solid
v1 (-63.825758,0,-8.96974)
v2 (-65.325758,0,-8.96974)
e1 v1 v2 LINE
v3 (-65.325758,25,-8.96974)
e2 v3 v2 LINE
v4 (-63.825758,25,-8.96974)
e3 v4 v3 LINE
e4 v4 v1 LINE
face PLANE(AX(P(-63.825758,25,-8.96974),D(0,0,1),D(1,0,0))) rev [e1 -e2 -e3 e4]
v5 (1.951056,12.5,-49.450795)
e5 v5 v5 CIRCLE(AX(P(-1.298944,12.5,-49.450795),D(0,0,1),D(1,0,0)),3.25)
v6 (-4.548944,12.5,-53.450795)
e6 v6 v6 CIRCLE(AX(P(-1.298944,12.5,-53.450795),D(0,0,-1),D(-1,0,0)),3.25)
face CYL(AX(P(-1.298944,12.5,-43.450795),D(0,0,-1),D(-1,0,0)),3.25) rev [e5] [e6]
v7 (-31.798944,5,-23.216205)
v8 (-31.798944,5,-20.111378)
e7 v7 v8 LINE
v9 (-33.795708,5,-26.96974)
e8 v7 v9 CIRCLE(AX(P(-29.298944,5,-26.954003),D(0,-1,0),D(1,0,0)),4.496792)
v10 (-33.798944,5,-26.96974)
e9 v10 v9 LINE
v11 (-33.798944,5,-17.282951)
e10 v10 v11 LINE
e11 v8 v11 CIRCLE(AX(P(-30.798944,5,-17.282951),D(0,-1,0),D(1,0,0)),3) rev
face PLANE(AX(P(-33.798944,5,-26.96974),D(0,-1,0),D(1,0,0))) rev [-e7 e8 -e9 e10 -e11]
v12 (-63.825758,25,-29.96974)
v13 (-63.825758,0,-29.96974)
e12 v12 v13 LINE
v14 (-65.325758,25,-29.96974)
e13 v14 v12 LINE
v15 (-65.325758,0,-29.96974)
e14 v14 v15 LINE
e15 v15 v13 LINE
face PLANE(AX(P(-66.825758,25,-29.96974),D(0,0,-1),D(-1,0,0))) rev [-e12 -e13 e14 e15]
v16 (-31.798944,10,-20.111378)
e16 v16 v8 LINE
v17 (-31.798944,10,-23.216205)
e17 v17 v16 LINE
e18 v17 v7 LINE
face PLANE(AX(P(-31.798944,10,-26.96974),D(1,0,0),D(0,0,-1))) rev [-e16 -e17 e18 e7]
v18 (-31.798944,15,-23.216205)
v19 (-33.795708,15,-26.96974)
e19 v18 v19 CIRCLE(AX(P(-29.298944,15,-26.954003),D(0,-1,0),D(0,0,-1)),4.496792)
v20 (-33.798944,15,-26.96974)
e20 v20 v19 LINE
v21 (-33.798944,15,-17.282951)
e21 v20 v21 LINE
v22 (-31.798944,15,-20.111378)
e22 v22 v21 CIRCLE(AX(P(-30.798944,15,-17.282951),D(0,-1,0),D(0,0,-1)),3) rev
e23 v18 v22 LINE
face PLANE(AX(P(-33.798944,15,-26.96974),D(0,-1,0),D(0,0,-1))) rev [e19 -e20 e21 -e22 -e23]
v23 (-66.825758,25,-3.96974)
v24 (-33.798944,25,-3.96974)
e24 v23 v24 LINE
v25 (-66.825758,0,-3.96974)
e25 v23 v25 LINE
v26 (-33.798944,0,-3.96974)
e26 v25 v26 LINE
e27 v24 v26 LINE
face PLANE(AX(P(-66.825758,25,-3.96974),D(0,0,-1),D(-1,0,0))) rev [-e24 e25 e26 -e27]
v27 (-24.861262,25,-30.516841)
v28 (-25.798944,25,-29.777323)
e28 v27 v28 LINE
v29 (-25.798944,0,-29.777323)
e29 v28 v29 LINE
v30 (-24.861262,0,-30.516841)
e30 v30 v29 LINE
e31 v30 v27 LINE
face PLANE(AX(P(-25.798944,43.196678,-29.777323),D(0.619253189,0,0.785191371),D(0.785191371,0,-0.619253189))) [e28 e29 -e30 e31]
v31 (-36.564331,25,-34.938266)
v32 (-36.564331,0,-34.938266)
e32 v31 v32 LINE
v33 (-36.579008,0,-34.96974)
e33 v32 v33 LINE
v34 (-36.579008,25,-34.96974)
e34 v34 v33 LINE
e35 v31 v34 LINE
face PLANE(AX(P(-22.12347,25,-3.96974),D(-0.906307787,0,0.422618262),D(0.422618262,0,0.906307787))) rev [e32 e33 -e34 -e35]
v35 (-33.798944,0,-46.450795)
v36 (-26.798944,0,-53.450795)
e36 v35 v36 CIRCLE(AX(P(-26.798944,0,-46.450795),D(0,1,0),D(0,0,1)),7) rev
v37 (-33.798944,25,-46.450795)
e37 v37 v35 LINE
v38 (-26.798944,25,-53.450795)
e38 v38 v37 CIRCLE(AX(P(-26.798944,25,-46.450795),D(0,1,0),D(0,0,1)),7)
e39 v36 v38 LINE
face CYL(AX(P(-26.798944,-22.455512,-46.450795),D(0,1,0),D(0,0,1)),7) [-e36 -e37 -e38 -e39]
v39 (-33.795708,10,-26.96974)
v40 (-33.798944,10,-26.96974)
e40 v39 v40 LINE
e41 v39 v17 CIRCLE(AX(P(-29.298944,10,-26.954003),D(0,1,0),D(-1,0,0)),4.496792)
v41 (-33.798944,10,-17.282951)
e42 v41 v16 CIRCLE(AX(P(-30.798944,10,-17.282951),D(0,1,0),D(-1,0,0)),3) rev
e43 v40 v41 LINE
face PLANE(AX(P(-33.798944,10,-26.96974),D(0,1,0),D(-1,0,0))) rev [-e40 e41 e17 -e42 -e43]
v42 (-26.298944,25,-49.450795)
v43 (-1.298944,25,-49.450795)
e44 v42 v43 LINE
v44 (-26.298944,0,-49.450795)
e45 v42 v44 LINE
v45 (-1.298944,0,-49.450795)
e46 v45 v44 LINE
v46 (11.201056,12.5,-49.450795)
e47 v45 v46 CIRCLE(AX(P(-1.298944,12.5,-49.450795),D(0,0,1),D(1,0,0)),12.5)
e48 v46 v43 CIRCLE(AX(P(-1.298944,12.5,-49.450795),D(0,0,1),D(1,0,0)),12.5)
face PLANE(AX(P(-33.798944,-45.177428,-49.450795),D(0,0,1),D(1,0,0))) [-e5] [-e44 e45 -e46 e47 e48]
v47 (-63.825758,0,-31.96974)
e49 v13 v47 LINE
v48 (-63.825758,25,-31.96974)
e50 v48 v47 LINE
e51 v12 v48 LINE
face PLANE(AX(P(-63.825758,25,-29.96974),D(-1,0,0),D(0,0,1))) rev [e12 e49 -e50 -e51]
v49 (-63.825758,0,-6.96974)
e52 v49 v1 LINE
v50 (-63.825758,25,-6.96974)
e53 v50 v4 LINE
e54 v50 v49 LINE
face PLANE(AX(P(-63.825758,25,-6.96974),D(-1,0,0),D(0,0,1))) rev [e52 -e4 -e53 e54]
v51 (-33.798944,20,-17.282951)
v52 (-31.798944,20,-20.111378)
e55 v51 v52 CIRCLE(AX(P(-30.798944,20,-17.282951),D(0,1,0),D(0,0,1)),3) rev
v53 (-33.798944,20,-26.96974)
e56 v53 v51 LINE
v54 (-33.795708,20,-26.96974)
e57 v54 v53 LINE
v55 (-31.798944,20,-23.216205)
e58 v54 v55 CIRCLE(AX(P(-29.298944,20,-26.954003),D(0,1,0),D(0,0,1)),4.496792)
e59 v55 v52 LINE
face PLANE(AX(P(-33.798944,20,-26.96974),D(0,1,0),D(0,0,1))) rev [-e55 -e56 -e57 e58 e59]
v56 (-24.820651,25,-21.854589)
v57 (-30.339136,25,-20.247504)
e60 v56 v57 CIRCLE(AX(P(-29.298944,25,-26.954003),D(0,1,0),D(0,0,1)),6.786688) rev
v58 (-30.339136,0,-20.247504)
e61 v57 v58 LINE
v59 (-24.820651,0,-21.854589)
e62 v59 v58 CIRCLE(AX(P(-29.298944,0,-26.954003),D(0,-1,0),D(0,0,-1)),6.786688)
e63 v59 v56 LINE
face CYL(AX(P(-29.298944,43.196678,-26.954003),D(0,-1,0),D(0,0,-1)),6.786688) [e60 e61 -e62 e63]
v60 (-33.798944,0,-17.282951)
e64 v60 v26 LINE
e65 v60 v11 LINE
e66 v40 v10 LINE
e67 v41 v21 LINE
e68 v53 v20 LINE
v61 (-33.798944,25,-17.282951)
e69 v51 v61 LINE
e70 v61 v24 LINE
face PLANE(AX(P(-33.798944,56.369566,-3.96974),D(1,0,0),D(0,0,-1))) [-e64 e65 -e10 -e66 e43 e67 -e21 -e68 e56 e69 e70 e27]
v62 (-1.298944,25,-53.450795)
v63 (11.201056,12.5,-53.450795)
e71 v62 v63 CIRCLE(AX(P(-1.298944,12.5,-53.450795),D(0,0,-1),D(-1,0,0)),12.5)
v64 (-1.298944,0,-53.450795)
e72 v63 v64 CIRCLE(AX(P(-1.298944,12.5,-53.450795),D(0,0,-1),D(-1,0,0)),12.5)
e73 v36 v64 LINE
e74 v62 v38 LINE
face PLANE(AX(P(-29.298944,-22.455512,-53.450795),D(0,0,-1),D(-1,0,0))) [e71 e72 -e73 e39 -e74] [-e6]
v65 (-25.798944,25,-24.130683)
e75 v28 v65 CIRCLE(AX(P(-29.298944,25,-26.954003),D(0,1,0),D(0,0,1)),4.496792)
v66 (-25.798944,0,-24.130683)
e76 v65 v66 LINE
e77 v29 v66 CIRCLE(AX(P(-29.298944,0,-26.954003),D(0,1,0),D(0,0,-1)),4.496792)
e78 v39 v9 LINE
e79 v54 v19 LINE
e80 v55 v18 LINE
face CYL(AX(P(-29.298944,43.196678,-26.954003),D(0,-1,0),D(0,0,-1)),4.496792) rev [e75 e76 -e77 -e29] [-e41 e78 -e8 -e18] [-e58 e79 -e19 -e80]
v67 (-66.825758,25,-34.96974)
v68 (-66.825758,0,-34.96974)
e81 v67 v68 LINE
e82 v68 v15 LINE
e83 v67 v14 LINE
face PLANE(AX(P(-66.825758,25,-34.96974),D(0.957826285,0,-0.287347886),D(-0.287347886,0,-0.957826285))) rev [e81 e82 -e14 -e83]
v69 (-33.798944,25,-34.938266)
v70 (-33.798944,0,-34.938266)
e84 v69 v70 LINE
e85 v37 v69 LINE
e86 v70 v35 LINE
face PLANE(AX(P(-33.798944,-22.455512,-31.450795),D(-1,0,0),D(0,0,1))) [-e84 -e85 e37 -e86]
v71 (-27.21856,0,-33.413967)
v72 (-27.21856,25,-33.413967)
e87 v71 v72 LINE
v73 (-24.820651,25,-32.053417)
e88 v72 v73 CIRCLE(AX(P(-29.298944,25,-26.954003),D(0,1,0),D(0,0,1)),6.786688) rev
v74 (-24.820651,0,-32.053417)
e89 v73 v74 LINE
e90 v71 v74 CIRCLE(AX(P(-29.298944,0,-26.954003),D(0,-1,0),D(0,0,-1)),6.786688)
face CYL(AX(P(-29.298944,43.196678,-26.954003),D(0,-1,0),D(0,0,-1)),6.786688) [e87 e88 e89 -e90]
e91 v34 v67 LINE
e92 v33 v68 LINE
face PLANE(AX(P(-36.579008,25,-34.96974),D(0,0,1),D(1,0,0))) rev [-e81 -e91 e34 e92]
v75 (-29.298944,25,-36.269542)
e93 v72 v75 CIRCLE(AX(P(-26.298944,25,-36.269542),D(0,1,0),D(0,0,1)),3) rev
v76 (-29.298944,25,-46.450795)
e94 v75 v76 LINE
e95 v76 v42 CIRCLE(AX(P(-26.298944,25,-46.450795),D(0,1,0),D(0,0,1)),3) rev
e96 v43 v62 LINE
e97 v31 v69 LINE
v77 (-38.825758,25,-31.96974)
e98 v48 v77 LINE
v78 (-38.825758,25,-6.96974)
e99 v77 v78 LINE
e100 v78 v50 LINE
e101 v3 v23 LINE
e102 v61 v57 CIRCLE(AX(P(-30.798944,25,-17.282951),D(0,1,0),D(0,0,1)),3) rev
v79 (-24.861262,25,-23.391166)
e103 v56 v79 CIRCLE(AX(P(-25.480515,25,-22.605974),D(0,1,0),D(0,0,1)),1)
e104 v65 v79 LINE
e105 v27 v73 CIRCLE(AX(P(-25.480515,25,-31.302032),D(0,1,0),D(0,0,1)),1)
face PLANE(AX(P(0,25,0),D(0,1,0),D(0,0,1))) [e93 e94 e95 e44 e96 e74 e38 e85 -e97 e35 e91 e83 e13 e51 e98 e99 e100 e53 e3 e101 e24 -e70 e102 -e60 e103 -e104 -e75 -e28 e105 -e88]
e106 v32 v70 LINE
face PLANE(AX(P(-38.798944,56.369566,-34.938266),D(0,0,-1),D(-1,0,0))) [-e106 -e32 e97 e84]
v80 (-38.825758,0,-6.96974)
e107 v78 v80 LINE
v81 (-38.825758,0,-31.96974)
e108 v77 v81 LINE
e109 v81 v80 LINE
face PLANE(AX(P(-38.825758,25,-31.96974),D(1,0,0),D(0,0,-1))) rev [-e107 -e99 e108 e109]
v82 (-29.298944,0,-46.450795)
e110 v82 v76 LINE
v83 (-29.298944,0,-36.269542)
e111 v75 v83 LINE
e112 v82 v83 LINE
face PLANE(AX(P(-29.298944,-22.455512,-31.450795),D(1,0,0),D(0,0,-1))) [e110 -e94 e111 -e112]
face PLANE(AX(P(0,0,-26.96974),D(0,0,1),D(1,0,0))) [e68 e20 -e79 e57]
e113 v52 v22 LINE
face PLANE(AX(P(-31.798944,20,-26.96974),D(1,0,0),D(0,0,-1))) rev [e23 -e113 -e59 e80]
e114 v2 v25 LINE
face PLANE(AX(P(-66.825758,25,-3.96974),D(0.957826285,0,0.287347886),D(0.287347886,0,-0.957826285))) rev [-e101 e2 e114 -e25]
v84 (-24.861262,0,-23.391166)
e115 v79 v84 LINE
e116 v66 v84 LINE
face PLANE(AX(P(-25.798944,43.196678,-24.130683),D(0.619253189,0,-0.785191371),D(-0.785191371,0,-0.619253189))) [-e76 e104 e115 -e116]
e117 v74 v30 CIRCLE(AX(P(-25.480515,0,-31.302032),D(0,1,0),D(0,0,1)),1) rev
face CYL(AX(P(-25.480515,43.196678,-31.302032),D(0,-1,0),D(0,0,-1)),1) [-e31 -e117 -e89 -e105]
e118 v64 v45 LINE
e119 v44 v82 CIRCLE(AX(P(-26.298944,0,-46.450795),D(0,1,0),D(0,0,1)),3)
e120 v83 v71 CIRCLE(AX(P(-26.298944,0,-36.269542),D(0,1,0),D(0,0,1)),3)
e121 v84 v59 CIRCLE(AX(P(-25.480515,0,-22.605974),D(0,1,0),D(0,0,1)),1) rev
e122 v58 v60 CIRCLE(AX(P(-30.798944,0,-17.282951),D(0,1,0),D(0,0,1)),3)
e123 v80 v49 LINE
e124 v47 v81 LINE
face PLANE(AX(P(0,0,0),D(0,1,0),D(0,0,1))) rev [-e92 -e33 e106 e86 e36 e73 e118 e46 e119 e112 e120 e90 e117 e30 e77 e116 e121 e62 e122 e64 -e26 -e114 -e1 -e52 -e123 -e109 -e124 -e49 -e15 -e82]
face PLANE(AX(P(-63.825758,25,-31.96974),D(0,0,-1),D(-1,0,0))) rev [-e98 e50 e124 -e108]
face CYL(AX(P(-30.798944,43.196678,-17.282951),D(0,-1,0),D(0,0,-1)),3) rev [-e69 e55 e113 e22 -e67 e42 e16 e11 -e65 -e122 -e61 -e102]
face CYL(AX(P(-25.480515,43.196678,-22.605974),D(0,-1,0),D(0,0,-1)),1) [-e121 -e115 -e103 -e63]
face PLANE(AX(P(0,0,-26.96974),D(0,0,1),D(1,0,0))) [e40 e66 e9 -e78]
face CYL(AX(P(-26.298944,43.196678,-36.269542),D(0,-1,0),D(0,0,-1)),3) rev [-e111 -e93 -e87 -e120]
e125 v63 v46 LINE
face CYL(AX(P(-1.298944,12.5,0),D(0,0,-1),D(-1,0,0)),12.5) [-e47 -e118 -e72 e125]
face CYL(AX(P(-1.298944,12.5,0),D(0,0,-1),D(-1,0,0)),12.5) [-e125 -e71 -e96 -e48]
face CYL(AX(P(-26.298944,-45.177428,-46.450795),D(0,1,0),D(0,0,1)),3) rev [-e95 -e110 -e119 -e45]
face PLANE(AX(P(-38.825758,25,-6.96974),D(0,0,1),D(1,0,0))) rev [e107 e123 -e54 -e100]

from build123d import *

# Parameters (mm, degrees)
EXTRUDE_1_DEPTH      = 25
CUT_EXTRUDE_4_DEPTH  = 80.457942189
SKETCH_7_W           = 16.60831278
SKETCH_7_H           = 38.473598513
CUT_EXTRUDE_14_DEPTH = 80.457942189
SKETCH_8_W           = 5
SKETCH_8_H           = 30.968526609
EXTRUDE_2_DEPTH      = 25
EXTRUDE_3_DEPTH      = 25
FILLET_4_R           = 1
SKETCH_10_W          = 10.885979968
SKETCH_10_H          = 16.094938527
CUT_EXTRUDE_15_DEPTH = 80.457942189
SKETCH_11_W          = 4.5
SKETCH_11_H          = 22
EXTRUDE_5_DEPTH      = 25
SKETCH_14_W          = 45
SKETCH_14_H          = 4
EXTRUDE_6_DEPTH      = 25
SKETCH_15_R          = 3.25
CUT_EXTRUDE_19_DEPTH = 10
FILLET_5_R           = 12.5
FILLET_6_R           = 3
FILLET_7_R           = 7
FILLET_8_R           = 3
SKETCH_17_W          = 2
SKETCH_17_H          = 5
CUT_EXTRUDE_21_DEPTH = 23


with BuildPart() as part:
    # Эскиз1 → Бобышка-Вытянуть1 (new body)
    with BuildSketch(Plane(origin=(0, 0, 0), x_dir=(1, 0, 0), z_dir=(0, 1, 0))):
        Polygon((-66.825757576, 34.969739794), (-66.825757576, 29.969739794), (-63.825757576, 29.969739794), (-63.825757576, 31.969739794), (-38.825757576, 31.969739794), (-38.825757576, 6.969739794), (-63.825757576, 6.969739794), (-63.825757576, 8.969739794), (-66.825757576, 8.969739794), (-66.825757576, 3.969739794), (-22.123470102, 3.969739794), (-36.579007505, 34.969739794), align=None)
    extrude(amount=EXTRUDE_1_DEPTH)

    # Эскиз3 → Вырез-Вытянуть4 (cut, through all)
    with BuildSketch(Plane.XZ):
        Polygon((-66.825757576, -3.969739794), (-65.325757576, -8.969739794), (-66.825757576, -8.969739794), align=None)
        Polygon((-66.825757576, -29.969739794), (-66.825757576, -34.969739794), (-65.325757576, -29.969739794), align=None)
    extrude(amount=-CUT_EXTRUDE_4_DEPTH, mode=Mode.SUBTRACT)

    # Эскиз7 → Вырез-Вытянуть14 (cut, through all)
    with BuildSketch(Plane(origin=(0, 0, 0), x_dir=(-1, 0, 0), z_dir=(0, -1, 0))):
        with Locations((27.703474463, 20.539743139)):
            Rectangle(SKETCH_7_W, SKETCH_7_H)
    extrude(amount=-CUT_EXTRUDE_14_DEPTH, mode=Mode.SUBTRACT)

    # Эскиз8 → Бобышка-Вытянуть2 (add)
    with BuildSketch(Plane(origin=(0, 0, 0), x_dir=(-1, 0, 0), z_dir=(0, -1, 0))):
        with Locations((36.298943925, 19.454003098)):
            Rectangle(SKETCH_8_W, SKETCH_8_H)
    extrude(amount=-EXTRUDE_2_DEPTH)

    # Эскиз9 → Бобышка-Вытянуть3 (add)
    with BuildSketch(Plane.XZ):
        with BuildLine():
            Line((-25.798943925, -9.121669553), (-24.000865345, -7.695483003))
            ThreePointArc((-24.000865345, -7.695483003), (-36.096342696, -11.954003099), (-24.000865345, -16.212523195))
            Line((-24.000865345, -16.212523195), (-25.798943925, -14.786336644))
            ThreePointArc((-25.798943925, -14.786336644), (-33.80140029, -11.954003099), (-25.798943925, -9.121669553))
        make_face()
        with BuildLine():
            Line((-25.798943925, -24.130682885), (-24.000865345, -22.7126007))
            ThreePointArc((-24.000865345, -22.7126007), (-36.0856317, -26.954003099), (-24.000865345, -31.195405497))
            Line((-24.000865345, -31.195405497), (-25.798943925, -29.777323313))
            ThreePointArc((-25.798943925, -29.777323313), (-33.795735785, -26.954003099), (-25.798943925, -24.130682885))
        make_face()
    extrude(amount=-EXTRUDE_3_DEPTH)

    # Скругление4
    fillet_4_edges = [part.edges().sort_by_distance(p)[0] for p in [
        (-24.000865345, 12.5, -7.695483003),
        (-24.000865345, 12.5, -16.212523195),
        (-24.000865345, 12.5, -22.7126007),
        (-24.000865345, 12.5, -31.195405497),
    ]]
    fillet(fillet_4_edges, radius=FILLET_4_R)

    # Эскиз10 → Вырез-Вытянуть15 (cut, through all)
    with BuildSketch(Plane(origin=(0, 25, 0), x_dir=(1, 0, 0), z_dir=(0, 1, 0))):
        with Locations((-28.355953941, 12.017209058)):
            Rectangle(SKETCH_10_W, SKETCH_10_H)
    extrude(amount=-CUT_EXTRUDE_15_DEPTH, mode=Mode.SUBTRACT)

    # Эскиз11 → Бобышка-Вытянуть5 (add)
    with BuildSketch(Plane(origin=(0, 25, 0), x_dir=(1, 0, 0), z_dir=(0, 1, 0))):
        with Locations((-31.548943925, 42.450794958)):
            Rectangle(SKETCH_11_W, SKETCH_11_H)
    extrude(amount=-EXTRUDE_5_DEPTH)

    # Эскиз14 → Бобышка-Вытянуть6 (add)
    with BuildSketch(Plane(origin=(0, 25, 0), x_dir=(1, 0, 0), z_dir=(0, 1, 0))):
        with Locations((-11.298943925, 51.450794958)):
            Rectangle(SKETCH_14_W, SKETCH_14_H)
    extrude(amount=-EXTRUDE_6_DEPTH)

    # Эскиз15 → Вырез-Вытянуть19 (cut)
    with BuildSketch(Plane(origin=(0, 0, -53.450794958), x_dir=(-1, 0, 0), z_dir=(0, 0, -1))):
        with Locations((1.298943925, 12.5)):
            Circle(SKETCH_15_R)
    extrude(amount=-CUT_EXTRUDE_19_DEPTH, mode=Mode.SUBTRACT)

    # Скругление5
    fillet_5_edges = [part.edges().sort_by_distance(p)[0] for p in [
        (11.201056075, 0, -51.450794958),
        (11.201056075, 25, -51.450794958),
    ]]
    fillet(fillet_5_edges, radius=FILLET_5_R - 0.0001)  # a hair under: the kernel refuses the full size

    # Скругление6
    fillet_6_edges = [part.edges().sort_by_distance(p)[0] for p in [
        (-29.298943925, 12.5, -49.450794958),
    ]]
    fillet(fillet_6_edges, radius=FILLET_6_R)

    # Скругление7
    fillet_7_edges = [part.edges().sort_by_distance(p)[0] for p in [
        (-33.798943925, 12.5, -53.450794958),
    ]]
    fillet(fillet_7_edges, radius=FILLET_7_R)

    # Скругление8
    fillet_8_edges = [part.edges().sort_by_distance(p)[0] for p in [
        (-33.798943925, 12.5, -21.873734311),
        (-29.298943925, 12.5, -33.740690873),
    ]]
    fillet(fillet_8_edges, radius=FILLET_8_R)

    # Эскиз17 → Вырез-Вытянуть21 (cut)
    with BuildSketch(Plane.XY.offset(-3.969739794)):
        with Locations((-32.798943925, 17.5)):
            Rectangle(SKETCH_17_W, SKETCH_17_H)
        with Locations((-32.798943925, 7.5)):
            Rectangle(SKETCH_17_W, SKETCH_17_H)
    extrude(amount=-CUT_EXTRUDE_21_DEPTH, mode=Mode.SUBTRACT)


solid = part.part
